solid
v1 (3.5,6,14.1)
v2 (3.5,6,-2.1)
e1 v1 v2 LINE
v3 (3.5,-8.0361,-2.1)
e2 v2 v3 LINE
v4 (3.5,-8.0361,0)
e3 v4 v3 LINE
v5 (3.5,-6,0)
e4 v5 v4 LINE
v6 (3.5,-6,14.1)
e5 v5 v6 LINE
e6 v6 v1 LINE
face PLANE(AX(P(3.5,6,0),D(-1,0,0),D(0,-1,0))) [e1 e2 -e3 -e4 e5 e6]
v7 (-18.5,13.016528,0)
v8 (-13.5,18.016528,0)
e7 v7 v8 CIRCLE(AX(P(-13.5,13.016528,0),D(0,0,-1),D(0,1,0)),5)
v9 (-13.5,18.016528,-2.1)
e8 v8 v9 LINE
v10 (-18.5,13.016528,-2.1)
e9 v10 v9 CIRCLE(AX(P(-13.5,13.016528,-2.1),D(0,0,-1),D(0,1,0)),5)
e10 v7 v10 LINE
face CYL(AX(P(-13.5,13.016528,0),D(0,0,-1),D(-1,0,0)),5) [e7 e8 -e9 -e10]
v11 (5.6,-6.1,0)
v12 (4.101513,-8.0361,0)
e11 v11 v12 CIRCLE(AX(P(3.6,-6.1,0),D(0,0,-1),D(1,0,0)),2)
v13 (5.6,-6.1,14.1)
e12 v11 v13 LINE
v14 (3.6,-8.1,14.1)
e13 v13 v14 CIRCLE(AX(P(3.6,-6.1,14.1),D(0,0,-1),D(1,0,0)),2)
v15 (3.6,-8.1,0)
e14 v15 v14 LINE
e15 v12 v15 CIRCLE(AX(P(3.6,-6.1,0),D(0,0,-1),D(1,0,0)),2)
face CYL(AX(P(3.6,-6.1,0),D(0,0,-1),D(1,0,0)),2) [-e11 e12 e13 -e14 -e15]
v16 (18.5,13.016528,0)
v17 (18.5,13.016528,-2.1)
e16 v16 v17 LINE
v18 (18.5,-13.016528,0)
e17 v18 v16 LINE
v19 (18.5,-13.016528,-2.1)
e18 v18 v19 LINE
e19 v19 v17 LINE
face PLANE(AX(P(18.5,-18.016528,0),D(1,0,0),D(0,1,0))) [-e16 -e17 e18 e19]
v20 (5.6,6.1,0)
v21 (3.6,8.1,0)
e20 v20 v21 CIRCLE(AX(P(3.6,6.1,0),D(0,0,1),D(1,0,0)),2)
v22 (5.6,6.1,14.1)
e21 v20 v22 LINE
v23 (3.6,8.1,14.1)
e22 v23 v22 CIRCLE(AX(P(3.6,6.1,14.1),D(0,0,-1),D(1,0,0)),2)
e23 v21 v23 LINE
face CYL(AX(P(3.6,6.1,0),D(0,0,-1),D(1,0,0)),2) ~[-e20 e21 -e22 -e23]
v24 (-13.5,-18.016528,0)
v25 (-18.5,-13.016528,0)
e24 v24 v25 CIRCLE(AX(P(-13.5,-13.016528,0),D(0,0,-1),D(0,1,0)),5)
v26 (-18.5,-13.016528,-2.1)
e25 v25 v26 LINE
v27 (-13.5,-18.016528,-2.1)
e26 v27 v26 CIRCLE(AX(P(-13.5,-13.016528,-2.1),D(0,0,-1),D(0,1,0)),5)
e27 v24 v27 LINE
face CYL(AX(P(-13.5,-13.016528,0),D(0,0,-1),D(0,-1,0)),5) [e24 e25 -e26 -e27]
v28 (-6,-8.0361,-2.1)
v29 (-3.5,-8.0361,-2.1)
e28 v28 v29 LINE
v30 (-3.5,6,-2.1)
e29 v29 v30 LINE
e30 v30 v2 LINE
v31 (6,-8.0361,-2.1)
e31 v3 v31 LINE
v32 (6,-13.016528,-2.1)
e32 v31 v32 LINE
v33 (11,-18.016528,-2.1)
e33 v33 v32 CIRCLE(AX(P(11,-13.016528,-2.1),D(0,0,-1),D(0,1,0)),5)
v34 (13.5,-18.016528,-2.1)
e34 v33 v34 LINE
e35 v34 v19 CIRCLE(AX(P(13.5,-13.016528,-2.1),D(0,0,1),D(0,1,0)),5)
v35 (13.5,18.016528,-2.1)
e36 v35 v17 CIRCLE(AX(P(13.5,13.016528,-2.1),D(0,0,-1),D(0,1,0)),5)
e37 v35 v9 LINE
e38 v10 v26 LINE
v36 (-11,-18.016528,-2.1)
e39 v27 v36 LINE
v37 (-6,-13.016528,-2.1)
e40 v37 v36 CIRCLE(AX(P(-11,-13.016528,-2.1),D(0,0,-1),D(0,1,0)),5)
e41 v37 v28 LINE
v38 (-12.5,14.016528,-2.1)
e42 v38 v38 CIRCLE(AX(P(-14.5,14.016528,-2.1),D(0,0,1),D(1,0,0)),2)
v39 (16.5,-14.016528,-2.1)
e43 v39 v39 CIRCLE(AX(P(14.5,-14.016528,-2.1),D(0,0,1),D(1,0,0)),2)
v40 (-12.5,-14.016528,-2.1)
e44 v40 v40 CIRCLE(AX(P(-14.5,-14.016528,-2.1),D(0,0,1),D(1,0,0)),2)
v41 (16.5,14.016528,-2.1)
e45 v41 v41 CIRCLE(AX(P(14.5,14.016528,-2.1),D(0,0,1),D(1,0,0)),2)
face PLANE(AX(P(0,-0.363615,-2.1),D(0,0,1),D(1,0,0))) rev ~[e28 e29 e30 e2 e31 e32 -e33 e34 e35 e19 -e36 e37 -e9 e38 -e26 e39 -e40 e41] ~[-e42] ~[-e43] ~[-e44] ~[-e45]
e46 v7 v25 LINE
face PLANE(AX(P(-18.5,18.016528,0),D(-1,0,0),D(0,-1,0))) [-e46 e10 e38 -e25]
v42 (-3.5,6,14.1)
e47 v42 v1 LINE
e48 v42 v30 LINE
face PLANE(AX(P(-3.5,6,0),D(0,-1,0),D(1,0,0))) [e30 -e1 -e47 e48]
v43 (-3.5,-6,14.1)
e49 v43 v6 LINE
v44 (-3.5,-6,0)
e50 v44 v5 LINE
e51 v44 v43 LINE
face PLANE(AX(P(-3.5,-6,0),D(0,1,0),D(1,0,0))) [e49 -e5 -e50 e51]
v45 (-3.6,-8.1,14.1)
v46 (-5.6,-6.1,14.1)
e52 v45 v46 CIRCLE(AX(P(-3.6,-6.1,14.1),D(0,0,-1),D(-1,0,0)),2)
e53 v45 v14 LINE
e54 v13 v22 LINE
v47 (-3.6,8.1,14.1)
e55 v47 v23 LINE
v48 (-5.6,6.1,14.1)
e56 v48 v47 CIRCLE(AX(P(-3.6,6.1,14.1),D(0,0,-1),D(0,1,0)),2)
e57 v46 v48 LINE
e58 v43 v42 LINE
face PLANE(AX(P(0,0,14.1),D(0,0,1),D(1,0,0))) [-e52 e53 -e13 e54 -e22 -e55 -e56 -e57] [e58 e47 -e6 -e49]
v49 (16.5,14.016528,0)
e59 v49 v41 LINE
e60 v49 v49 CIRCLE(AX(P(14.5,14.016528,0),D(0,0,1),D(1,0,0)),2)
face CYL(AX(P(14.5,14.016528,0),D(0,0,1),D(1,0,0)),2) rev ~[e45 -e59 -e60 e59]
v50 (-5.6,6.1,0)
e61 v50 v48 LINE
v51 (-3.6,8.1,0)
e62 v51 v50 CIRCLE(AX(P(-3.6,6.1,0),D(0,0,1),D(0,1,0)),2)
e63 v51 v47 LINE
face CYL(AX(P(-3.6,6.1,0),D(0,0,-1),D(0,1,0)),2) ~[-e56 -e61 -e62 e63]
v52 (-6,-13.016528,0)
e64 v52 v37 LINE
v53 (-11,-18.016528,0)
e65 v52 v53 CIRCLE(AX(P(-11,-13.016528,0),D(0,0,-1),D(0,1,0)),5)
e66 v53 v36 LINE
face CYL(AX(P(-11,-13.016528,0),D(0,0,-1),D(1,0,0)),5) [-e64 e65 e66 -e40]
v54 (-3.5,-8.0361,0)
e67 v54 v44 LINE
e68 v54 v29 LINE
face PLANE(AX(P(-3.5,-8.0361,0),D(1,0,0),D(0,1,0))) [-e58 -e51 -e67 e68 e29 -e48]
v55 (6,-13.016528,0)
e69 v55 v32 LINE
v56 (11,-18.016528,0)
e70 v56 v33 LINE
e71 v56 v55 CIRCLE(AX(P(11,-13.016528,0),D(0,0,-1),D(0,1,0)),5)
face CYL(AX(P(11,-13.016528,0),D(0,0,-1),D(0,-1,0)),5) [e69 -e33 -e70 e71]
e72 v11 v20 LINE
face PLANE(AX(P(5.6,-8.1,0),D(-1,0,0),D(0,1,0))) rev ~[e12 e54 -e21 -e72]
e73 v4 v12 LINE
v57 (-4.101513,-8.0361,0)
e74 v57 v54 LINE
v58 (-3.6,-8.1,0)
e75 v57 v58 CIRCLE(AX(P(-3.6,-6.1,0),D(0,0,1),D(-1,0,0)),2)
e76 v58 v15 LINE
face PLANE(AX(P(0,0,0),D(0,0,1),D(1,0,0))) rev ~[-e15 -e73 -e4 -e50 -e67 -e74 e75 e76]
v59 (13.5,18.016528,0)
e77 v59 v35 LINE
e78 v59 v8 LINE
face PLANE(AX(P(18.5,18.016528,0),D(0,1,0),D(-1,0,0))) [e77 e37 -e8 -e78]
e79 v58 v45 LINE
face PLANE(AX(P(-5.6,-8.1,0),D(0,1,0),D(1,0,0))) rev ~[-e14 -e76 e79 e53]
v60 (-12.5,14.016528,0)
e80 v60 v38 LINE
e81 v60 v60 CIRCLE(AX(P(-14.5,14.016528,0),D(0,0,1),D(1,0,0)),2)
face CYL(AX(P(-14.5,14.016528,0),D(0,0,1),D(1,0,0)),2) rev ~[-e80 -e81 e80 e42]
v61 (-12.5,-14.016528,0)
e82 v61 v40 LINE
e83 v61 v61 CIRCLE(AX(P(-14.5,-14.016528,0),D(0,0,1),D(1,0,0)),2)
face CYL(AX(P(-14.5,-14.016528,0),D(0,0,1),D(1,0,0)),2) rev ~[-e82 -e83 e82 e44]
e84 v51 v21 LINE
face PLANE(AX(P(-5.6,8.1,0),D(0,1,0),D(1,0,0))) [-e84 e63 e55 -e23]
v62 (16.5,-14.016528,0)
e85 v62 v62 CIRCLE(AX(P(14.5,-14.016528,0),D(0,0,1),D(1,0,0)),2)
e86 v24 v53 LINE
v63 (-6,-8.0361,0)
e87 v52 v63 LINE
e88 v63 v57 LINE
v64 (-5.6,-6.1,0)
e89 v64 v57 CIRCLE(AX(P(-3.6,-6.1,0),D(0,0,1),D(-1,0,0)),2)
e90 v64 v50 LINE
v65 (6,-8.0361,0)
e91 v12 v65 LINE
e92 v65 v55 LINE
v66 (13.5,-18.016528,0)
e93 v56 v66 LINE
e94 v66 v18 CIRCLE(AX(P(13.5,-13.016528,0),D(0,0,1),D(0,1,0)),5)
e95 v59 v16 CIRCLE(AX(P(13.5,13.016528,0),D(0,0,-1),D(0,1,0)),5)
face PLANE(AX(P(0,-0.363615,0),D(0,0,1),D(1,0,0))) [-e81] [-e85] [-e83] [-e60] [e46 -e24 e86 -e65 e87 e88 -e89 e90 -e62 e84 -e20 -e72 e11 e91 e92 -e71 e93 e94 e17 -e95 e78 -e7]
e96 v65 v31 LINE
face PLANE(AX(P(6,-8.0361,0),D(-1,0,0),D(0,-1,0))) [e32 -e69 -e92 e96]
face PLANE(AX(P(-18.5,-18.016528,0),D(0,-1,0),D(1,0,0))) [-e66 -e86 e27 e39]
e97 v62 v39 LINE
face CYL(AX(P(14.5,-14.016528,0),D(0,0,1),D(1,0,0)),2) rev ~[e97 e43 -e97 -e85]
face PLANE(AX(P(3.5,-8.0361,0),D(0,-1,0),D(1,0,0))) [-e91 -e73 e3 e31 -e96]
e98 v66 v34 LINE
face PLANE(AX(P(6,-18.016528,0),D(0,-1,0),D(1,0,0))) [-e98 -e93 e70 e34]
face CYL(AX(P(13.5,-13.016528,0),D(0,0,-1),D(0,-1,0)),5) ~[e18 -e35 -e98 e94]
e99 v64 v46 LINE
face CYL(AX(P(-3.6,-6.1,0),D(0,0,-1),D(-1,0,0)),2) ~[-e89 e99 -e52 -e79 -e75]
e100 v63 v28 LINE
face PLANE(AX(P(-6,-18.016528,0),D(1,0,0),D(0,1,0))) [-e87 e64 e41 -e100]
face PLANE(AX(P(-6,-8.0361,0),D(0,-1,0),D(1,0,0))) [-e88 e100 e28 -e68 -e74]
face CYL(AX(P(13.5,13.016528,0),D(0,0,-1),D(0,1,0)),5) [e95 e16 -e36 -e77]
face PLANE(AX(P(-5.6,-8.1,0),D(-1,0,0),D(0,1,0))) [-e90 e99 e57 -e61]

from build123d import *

# Parameters (mm, degrees)
F0_W        = 11.2
F0_H        = 16.2
F0_W_2      = 7
F0_H_2      = 12
F1_DEPTH    = 14.1
F2_R        = 2
F3_DEPTH    = 2.1
F4_R        = 5
F5_T1_DEPTH = 19.1


# Not quite as in the source:
# - a fillet or chamfer that OpenCascade refuses, or shapes differently, is made with other operations: its cross-section is extruded or revolved along the edge and cut away or added


with BuildPart() as f1:
    # F0 (on Top) → F1 (new body)
    with BuildSketch(Plane.XY):
        Rectangle(F0_W, F0_H)
        Rectangle(F0_W_2, F0_H_2, mode=Mode.SUBTRACT)
    extrude(amount=F1_DEPTH)

    # F2 (on Top) → F3 (join)
    with BuildSketch(Plane.XY):
        Polygon((6, -18.0165283297), (18.5, -18.0165283297), (18.5, 0), (18.5, 18.0165283297), (-18.5, 18.0165283297), (-18.5, 0), (-18.5, -14.0165283297), (-18.5, -18.0165283297), (-14.5, -18.0165283297), (-6, -18.0165283297), (-6, -8.0361003056), (-3.5, -8.0361003056), (-3.5, -6), (-3.5, 0), (-3.5, 6), (3.5, 6), (3.5, 0), (3.5, -6), (3.5, -8.0361003056), (6, -8.0361003056), align=None)
        with Locations((-14.5, -14.0165283297)):
            Circle(F2_R, mode=Mode.SUBTRACT)
        with Locations((14.5, -14.0165283297)):
            Circle(F2_R, mode=Mode.SUBTRACT)
        with Locations((-14.5, 14.0165283297)):
            Circle(F2_R, mode=Mode.SUBTRACT)
        with Locations((14.5, 14.0165283297)):
            Circle(F2_R, mode=Mode.SUBTRACT)
    extrude(amount=-F3_DEPTH)

    # F4
    f4_edges = [f1.edges().sort_by_distance(p)[0] for p in [
        (-18.5, 18.016528, -1.05),
        (18.5, 18.016528, -1.05),
        (18.5, -18.016528, -1.05),
        (-18.5, -18.016528, -1.05),
        (6, -18.016528, -1.05),
        (-6, -18.016528, -1.05),
    ]]
    fillet(f4_edges, radius=F4_R)

    # F5: fillet of radius 2 on 4 edges, made by hand

    # F5_s2 → F5_t1 (cut)
    with BuildSketch(Plane.XY):
        with BuildLine():
            ThreePointArc((5.6, 6.1), (5.0142135624, 7.5142135624), (3.6, 8.1))
            Line((3.6, 8.1), (5.6, 8.1))
            Line((5.6, 8.1), (5.6, 6.1))
        make_face()
        with BuildLine():
            ThreePointArc((-3.6, 8.1), (-5.0142135624, 7.5142135624), (-5.6, 6.1))
            Line((-5.6, 6.1), (-5.6, 8.1))
            Line((-5.6, 8.1), (-3.6, 8.1))
        make_face()
        with BuildLine():
            ThreePointArc((5.6, -6.1), (5.0142135624, -7.5142135624), (3.6, -8.1))
            Line((3.6, -8.1), (5.6, -8.1))
            Line((5.6, -8.1), (5.6, -6.1))
        make_face()
        with BuildLine():
            ThreePointArc((-5.6, -6.1), (-5.0142135624, -7.5142135624), (-3.6, -8.1))
            Line((-3.6, -8.1), (-5.6, -8.1))
            Line((-5.6, -8.1), (-5.6, -6.1))
        make_face()
    extrude(amount=F5_T1_DEPTH, mode=Mode.SUBTRACT)


solid = f1.part
